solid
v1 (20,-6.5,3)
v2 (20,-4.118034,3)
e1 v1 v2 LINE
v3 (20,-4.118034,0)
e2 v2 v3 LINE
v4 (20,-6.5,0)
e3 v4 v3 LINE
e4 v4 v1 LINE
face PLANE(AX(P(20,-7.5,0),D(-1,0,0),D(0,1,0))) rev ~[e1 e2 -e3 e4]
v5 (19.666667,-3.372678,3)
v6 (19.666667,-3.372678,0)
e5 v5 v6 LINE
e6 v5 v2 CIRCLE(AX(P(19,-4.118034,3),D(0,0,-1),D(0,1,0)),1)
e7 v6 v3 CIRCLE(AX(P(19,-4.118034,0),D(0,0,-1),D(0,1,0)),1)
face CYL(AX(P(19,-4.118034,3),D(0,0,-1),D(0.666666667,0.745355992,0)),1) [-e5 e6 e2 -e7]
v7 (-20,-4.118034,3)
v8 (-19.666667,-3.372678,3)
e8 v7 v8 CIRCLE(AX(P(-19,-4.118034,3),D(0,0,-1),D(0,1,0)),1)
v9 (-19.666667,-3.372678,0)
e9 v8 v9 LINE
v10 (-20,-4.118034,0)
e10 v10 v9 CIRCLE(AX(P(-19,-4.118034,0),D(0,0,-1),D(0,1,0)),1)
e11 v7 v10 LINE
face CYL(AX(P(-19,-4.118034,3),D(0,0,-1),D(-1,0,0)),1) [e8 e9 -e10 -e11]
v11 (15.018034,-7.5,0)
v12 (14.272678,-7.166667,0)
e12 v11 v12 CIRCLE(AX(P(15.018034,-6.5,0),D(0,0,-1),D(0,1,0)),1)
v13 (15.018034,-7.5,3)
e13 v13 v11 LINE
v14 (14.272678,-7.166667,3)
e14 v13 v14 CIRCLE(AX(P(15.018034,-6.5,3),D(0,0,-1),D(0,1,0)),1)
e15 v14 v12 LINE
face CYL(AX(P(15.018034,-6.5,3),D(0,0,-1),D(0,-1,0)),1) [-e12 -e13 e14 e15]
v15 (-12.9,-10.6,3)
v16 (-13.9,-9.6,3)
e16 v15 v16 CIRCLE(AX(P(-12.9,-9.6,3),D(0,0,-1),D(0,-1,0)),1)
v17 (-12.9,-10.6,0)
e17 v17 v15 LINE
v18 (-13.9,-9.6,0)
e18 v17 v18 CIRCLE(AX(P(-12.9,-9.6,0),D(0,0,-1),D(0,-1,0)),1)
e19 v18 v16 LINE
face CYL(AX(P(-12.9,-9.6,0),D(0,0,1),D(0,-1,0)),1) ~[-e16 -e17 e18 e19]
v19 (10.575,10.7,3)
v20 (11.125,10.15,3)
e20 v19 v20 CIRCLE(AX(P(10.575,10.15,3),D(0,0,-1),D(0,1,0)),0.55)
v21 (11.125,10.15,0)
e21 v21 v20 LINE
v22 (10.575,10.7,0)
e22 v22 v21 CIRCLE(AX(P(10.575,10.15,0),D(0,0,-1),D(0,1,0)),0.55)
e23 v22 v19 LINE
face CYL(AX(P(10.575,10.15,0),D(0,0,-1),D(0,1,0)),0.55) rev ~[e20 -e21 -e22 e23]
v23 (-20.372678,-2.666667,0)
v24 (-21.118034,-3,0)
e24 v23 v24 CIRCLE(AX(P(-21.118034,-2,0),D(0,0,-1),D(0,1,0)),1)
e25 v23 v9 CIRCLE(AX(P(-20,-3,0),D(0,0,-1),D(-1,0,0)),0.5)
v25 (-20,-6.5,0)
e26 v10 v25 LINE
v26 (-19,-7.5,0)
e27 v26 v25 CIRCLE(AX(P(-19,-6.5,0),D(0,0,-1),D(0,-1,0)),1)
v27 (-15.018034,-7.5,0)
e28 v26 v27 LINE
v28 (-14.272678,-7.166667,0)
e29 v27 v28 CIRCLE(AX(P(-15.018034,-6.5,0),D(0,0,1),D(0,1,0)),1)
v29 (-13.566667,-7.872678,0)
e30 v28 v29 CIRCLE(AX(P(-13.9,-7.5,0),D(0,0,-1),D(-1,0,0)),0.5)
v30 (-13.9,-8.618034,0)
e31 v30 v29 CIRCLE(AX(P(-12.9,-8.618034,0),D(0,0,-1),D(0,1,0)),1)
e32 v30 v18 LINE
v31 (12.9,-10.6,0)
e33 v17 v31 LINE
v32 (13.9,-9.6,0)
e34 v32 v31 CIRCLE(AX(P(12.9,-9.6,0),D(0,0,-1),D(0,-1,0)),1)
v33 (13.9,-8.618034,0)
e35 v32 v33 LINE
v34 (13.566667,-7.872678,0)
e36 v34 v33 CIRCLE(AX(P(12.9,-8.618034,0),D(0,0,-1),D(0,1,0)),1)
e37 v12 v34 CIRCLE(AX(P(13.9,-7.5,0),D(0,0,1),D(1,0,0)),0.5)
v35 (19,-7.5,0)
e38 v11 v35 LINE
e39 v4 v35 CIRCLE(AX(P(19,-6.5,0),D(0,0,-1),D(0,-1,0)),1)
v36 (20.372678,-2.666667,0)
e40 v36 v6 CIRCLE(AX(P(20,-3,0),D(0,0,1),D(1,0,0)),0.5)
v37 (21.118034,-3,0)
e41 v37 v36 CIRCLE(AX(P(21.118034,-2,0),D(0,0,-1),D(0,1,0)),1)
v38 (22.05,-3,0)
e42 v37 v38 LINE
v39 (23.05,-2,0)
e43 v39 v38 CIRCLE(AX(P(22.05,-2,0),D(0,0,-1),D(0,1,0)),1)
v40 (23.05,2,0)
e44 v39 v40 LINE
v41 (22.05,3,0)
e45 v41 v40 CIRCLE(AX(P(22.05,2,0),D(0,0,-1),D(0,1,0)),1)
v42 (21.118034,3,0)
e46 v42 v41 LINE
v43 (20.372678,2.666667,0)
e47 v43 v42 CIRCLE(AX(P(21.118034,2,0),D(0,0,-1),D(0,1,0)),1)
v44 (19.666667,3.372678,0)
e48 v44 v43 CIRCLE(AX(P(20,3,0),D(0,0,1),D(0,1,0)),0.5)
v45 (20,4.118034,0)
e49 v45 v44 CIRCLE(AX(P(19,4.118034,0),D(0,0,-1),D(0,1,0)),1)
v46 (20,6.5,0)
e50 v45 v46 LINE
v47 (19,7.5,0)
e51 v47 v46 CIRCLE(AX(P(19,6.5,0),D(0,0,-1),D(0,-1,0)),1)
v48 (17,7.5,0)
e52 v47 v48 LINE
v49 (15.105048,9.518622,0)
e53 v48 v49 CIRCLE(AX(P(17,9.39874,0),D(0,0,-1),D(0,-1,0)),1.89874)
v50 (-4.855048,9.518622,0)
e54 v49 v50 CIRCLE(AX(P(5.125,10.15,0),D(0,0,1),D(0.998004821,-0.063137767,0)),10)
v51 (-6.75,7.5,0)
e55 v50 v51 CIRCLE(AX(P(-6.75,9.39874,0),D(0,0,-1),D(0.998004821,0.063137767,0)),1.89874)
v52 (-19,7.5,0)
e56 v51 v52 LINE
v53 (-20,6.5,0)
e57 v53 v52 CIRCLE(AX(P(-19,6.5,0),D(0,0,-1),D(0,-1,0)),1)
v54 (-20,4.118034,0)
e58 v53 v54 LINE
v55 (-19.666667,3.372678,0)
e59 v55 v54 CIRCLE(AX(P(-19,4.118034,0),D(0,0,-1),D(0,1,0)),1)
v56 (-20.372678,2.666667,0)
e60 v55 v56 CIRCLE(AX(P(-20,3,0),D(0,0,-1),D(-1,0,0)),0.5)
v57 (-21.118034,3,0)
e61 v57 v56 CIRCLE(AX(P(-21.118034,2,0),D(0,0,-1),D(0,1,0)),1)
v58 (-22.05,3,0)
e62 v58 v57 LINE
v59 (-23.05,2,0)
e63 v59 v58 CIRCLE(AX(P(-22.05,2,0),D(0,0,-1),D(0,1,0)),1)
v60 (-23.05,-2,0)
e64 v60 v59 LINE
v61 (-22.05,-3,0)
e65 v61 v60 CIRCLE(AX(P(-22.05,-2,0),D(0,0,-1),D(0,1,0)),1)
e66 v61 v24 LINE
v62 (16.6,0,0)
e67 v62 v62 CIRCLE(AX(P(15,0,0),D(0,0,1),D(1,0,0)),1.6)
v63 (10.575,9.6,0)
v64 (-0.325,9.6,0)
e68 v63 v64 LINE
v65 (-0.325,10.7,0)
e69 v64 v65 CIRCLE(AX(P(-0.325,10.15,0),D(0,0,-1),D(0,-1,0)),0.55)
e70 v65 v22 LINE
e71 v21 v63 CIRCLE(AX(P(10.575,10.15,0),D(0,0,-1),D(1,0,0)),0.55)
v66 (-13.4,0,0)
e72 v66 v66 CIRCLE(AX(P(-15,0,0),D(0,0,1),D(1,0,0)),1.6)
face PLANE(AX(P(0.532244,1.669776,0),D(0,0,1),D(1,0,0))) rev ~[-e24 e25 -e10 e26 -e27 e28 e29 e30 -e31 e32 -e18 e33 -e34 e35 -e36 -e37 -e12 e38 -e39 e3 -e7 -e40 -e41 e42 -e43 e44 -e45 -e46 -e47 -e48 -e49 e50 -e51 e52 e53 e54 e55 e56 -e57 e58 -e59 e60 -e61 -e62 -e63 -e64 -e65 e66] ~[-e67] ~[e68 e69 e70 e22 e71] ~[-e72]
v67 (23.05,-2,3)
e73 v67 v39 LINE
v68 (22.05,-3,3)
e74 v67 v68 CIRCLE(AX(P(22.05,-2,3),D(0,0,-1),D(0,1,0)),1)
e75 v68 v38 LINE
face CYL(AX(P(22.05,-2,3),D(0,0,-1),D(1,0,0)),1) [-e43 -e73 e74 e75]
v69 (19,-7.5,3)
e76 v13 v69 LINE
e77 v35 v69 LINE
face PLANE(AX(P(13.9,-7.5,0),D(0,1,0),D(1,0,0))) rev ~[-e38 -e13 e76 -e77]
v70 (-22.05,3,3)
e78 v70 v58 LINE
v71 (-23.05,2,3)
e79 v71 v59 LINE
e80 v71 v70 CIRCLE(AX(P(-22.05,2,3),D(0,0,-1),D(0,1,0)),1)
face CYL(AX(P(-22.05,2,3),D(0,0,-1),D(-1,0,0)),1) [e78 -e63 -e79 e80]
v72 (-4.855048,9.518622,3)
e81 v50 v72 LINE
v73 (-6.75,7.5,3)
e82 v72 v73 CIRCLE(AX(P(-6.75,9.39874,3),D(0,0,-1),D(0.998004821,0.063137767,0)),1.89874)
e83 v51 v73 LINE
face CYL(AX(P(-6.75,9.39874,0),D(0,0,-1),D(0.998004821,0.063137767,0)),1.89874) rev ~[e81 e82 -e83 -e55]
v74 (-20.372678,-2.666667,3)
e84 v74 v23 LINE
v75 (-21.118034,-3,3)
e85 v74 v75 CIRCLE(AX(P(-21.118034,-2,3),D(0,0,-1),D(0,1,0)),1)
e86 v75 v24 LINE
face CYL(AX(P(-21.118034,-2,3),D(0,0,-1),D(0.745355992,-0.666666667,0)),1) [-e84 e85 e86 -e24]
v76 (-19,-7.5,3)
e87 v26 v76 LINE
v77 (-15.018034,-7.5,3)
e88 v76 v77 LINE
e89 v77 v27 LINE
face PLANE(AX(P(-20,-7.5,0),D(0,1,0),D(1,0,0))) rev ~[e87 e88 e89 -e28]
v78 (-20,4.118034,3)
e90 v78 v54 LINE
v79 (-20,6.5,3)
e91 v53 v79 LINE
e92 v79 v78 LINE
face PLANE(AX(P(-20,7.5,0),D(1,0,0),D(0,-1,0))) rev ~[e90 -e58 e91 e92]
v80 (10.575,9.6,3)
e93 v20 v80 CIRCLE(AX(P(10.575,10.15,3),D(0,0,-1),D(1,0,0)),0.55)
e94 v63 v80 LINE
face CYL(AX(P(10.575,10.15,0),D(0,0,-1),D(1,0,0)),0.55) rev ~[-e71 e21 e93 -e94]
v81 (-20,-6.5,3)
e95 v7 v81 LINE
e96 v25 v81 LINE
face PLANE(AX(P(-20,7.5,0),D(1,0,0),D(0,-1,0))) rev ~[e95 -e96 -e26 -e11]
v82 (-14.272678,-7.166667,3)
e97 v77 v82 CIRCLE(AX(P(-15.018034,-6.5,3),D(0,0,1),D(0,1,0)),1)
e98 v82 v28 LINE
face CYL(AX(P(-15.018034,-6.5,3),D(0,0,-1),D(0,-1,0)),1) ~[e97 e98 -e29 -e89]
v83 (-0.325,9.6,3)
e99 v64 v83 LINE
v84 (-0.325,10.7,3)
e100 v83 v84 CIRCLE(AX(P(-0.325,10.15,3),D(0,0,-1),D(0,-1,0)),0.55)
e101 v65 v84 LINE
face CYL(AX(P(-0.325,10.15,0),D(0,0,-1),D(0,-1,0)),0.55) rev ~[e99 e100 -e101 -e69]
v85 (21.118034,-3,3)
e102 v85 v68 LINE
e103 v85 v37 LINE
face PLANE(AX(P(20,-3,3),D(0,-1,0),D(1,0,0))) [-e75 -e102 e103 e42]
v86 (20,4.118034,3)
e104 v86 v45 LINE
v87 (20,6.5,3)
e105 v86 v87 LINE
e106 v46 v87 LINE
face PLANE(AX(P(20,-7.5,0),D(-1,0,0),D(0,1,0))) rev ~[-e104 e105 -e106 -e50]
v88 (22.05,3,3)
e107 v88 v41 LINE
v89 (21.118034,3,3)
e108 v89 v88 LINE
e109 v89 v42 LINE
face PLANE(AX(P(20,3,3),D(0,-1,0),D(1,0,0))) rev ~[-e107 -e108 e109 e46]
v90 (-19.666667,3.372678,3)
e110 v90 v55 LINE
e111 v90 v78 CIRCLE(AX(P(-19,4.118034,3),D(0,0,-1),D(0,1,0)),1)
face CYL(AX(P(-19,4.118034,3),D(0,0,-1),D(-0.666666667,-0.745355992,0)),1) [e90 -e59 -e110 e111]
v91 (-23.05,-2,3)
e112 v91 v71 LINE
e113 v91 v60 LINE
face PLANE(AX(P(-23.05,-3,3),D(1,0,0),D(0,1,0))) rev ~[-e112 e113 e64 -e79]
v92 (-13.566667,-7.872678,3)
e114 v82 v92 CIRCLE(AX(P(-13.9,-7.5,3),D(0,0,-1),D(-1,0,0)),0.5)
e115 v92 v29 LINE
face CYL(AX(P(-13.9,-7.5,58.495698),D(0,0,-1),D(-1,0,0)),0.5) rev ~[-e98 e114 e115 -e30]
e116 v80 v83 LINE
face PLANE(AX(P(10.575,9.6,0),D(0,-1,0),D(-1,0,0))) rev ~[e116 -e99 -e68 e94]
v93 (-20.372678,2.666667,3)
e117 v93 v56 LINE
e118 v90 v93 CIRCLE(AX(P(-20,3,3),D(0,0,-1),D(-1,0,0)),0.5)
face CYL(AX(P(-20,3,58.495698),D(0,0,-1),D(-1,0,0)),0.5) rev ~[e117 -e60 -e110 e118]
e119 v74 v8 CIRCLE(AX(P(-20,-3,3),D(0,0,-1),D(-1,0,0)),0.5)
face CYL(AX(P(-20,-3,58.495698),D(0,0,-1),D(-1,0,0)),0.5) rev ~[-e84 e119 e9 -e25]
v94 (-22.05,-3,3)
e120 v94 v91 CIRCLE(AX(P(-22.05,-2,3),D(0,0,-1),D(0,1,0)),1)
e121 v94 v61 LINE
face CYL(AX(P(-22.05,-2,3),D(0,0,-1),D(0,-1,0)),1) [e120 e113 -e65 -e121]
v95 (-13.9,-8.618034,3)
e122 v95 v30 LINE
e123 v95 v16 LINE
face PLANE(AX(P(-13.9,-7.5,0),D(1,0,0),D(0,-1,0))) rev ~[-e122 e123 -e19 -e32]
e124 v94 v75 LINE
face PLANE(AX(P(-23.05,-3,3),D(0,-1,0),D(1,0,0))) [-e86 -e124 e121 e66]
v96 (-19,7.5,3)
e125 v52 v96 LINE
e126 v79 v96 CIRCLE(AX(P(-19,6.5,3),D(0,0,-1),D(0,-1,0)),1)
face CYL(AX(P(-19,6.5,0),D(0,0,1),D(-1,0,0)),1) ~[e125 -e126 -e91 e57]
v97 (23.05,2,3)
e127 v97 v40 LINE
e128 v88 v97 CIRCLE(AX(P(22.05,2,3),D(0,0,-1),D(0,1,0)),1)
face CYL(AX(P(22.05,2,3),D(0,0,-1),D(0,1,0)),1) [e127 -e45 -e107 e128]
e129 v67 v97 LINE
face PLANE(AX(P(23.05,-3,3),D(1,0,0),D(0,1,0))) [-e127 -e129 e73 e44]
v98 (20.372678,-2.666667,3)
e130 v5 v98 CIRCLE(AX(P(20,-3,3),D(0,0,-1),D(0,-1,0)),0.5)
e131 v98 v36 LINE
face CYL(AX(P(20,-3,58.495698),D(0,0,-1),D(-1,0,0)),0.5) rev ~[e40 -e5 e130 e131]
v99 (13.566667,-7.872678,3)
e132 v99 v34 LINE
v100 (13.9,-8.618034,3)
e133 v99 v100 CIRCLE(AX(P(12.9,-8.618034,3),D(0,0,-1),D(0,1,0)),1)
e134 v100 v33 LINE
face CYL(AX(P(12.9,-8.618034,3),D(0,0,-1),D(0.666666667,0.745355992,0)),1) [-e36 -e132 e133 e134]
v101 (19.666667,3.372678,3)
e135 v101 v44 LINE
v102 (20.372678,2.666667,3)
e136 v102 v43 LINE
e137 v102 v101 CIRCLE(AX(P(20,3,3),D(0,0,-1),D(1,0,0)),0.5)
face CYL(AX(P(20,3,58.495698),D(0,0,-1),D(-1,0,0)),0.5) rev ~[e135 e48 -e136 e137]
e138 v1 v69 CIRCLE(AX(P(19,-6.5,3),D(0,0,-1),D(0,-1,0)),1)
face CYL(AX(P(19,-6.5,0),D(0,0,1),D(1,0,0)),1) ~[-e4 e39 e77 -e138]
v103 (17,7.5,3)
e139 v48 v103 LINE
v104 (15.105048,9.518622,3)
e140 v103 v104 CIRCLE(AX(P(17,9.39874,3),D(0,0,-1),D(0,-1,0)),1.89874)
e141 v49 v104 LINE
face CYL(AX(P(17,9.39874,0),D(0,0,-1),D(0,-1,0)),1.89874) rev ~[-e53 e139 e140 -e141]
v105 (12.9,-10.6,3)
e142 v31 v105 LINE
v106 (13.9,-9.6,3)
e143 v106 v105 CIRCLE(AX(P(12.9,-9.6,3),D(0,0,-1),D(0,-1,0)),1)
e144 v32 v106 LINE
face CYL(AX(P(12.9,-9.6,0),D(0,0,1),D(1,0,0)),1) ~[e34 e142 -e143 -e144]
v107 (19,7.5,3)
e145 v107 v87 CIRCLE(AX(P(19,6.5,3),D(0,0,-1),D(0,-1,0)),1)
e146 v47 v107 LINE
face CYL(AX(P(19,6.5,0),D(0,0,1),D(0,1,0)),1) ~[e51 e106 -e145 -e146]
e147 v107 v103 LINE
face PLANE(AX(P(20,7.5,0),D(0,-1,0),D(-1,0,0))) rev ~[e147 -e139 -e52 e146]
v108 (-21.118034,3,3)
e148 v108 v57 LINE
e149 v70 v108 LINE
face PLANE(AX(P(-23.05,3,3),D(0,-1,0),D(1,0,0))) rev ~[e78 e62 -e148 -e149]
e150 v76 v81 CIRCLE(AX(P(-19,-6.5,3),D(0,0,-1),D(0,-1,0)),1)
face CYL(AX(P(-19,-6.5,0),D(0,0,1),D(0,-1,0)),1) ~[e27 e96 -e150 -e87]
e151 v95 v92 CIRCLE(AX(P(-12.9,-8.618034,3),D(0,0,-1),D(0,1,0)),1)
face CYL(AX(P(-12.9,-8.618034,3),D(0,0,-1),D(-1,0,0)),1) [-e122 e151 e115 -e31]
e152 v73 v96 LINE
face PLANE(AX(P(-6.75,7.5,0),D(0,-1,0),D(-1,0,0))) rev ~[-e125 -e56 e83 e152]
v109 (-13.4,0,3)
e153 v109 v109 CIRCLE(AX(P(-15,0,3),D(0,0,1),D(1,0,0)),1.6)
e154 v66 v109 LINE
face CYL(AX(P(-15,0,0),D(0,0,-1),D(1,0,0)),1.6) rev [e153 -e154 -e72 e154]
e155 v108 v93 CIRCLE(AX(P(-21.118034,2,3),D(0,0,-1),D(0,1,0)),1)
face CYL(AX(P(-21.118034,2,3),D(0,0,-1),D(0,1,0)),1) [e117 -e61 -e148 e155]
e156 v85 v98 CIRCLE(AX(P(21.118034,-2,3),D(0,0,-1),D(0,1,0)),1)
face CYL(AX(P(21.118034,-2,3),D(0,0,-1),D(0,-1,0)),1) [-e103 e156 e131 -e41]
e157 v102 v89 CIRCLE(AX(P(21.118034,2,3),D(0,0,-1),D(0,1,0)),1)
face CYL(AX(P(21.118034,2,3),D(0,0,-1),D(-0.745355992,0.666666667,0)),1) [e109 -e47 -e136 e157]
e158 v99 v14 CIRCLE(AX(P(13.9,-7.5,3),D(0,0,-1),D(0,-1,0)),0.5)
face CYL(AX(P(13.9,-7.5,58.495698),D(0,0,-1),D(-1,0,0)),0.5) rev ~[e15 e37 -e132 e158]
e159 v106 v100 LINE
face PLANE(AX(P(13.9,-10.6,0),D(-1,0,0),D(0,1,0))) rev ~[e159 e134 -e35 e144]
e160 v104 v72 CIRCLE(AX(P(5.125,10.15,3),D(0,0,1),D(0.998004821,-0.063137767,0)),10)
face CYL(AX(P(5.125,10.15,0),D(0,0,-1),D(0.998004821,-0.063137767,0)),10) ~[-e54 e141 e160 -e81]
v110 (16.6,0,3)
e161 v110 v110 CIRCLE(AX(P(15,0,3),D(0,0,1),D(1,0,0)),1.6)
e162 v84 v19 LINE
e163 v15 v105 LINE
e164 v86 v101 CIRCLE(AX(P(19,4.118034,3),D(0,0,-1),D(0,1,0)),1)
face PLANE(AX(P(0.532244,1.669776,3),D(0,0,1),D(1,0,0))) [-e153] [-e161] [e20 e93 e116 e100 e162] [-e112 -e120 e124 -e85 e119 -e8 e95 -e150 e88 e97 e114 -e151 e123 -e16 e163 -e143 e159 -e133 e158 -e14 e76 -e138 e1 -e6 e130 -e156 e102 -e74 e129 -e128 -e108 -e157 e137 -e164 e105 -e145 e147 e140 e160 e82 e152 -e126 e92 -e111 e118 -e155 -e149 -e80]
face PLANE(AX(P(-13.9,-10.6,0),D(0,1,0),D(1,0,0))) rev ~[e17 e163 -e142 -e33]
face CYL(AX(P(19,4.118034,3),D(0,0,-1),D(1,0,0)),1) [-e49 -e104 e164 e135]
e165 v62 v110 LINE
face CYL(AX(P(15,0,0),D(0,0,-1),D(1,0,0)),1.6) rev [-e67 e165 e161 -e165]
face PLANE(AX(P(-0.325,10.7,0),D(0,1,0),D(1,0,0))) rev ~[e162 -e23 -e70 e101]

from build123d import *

# Parameters (mm, degrees)
F0_R     = 1.6
F1_DEPTH = 3
F2_W     = 3.05
F2_H     = 6
F3_DEPTH = 3
F5_D     = 1
F6_R     = 1


with BuildPart() as f1:
    # F0 (on Top) → F1 (new body)
    with BuildSketch(Plane.XY):
        with BuildLine():
            Line((-20, 0), (-20, -7.5))
            Line((-20, -7.5), (-13.9, -7.5))
            Line((-13.9, -7.5), (-13.9, -10.6))
            Line((-13.9, -10.6), (13.9, -10.6))
            Line((13.9, -10.6), (13.9, -7.5))
            Line((13.9, -7.5), (20, -7.5))
            Line((20, -7.5), (20, 0))
            Line((20, 0), (20, 7.5))
            Line((20, 7.5), (17, 7.5))
            ThreePointArc((17, 7.5), (15.615651922, 8.0992038794), (15.1050482082, 9.5186223298))
            ThreePointArc((15.1050482082, 9.5186223298), (5.125, 20.15), (-4.8550482082, 9.5186223298))
            ThreePointArc((-4.8550482082, 9.5186223298), (-5.365651922, 8.0992038794), (-6.75, 7.5))
            Line((-6.75, 7.5), (-20, 7.5))
            Line((-20, 7.5), (-20, 0))
        make_face()
        with Locations((-15, 0)):
            Circle(F0_R, mode=Mode.SUBTRACT)
        with Locations((15, 0)):
            Circle(F0_R, mode=Mode.SUBTRACT)
        with BuildLine():
            ThreePointArc((-0.325, 9.6), (-0.875, 10.15), (-0.325, 10.7))
            Line((-0.325, 10.7), (10.575, 10.7))
            ThreePointArc((10.575, 10.7), (10.9639087297, 10.5389087297), (11.125, 10.15))
            ThreePointArc((11.125, 10.15), (10.9639087297, 9.7610912703), (10.575, 9.6))
            Line((10.575, 9.6), (-0.325, 9.6))
        make_face(mode=Mode.SUBTRACT)
    extrude(amount=F1_DEPTH)

    # F2 (on face) → F3 (join, through all)
    with BuildSketch(Plane.XY.offset(3)):
        with Locations((-21.525, 0)):
            Rectangle(F2_W, F2_H)
        with Locations((21.525, 0)):
            Rectangle(F2_W, F2_H)
    extrude(amount=-F3_DEPTH)

    # F5 (through all)
    with Locations(Plane.XY.offset(3)):
        with Locations((13.9, -7.5), (20, -3), (20, 3), (-13.9, -7.5), (-20, -3), (-20, 3)):
            Hole(F5_D / 2)

    # F6
    f6_edges = [f1.edges().sort_by_distance(p)[0] for p in [
        (20, 7.5, 1.5),
        (23.05, 3, 1.5),
        (23.05, -3, 1.5),
        (13.9, -10.6, 1.5),
        (20, -7.5, 1.5),
        (-23.05, 3, 1.5),
        (-20, 7.5, 1.5),
        (-20, -7.5, 1.5),
        (-13.9, -10.6, 1.5),
        (-23.05, -3, 1.5),
        (20, 3.5, 1.5),
        (20.5, 3, 1.5),
        (20.5, -3, 1.5),
        (20, -3.5, 1.5),
        (14.4, -7.5, 1.5),
        (13.9, -8, 1.5),
        (-13.9, -8, 1.5),
        (-14.4, -7.5, 1.5),
        (-20, -3.5, 1.5),
        (-20.5, -3, 1.5),
        (-20.5, 3, 1.5),
        (-20, 3.5, 1.5),
    ]]
    fillet(f6_edges, radius=F6_R)


solid = f1.part
